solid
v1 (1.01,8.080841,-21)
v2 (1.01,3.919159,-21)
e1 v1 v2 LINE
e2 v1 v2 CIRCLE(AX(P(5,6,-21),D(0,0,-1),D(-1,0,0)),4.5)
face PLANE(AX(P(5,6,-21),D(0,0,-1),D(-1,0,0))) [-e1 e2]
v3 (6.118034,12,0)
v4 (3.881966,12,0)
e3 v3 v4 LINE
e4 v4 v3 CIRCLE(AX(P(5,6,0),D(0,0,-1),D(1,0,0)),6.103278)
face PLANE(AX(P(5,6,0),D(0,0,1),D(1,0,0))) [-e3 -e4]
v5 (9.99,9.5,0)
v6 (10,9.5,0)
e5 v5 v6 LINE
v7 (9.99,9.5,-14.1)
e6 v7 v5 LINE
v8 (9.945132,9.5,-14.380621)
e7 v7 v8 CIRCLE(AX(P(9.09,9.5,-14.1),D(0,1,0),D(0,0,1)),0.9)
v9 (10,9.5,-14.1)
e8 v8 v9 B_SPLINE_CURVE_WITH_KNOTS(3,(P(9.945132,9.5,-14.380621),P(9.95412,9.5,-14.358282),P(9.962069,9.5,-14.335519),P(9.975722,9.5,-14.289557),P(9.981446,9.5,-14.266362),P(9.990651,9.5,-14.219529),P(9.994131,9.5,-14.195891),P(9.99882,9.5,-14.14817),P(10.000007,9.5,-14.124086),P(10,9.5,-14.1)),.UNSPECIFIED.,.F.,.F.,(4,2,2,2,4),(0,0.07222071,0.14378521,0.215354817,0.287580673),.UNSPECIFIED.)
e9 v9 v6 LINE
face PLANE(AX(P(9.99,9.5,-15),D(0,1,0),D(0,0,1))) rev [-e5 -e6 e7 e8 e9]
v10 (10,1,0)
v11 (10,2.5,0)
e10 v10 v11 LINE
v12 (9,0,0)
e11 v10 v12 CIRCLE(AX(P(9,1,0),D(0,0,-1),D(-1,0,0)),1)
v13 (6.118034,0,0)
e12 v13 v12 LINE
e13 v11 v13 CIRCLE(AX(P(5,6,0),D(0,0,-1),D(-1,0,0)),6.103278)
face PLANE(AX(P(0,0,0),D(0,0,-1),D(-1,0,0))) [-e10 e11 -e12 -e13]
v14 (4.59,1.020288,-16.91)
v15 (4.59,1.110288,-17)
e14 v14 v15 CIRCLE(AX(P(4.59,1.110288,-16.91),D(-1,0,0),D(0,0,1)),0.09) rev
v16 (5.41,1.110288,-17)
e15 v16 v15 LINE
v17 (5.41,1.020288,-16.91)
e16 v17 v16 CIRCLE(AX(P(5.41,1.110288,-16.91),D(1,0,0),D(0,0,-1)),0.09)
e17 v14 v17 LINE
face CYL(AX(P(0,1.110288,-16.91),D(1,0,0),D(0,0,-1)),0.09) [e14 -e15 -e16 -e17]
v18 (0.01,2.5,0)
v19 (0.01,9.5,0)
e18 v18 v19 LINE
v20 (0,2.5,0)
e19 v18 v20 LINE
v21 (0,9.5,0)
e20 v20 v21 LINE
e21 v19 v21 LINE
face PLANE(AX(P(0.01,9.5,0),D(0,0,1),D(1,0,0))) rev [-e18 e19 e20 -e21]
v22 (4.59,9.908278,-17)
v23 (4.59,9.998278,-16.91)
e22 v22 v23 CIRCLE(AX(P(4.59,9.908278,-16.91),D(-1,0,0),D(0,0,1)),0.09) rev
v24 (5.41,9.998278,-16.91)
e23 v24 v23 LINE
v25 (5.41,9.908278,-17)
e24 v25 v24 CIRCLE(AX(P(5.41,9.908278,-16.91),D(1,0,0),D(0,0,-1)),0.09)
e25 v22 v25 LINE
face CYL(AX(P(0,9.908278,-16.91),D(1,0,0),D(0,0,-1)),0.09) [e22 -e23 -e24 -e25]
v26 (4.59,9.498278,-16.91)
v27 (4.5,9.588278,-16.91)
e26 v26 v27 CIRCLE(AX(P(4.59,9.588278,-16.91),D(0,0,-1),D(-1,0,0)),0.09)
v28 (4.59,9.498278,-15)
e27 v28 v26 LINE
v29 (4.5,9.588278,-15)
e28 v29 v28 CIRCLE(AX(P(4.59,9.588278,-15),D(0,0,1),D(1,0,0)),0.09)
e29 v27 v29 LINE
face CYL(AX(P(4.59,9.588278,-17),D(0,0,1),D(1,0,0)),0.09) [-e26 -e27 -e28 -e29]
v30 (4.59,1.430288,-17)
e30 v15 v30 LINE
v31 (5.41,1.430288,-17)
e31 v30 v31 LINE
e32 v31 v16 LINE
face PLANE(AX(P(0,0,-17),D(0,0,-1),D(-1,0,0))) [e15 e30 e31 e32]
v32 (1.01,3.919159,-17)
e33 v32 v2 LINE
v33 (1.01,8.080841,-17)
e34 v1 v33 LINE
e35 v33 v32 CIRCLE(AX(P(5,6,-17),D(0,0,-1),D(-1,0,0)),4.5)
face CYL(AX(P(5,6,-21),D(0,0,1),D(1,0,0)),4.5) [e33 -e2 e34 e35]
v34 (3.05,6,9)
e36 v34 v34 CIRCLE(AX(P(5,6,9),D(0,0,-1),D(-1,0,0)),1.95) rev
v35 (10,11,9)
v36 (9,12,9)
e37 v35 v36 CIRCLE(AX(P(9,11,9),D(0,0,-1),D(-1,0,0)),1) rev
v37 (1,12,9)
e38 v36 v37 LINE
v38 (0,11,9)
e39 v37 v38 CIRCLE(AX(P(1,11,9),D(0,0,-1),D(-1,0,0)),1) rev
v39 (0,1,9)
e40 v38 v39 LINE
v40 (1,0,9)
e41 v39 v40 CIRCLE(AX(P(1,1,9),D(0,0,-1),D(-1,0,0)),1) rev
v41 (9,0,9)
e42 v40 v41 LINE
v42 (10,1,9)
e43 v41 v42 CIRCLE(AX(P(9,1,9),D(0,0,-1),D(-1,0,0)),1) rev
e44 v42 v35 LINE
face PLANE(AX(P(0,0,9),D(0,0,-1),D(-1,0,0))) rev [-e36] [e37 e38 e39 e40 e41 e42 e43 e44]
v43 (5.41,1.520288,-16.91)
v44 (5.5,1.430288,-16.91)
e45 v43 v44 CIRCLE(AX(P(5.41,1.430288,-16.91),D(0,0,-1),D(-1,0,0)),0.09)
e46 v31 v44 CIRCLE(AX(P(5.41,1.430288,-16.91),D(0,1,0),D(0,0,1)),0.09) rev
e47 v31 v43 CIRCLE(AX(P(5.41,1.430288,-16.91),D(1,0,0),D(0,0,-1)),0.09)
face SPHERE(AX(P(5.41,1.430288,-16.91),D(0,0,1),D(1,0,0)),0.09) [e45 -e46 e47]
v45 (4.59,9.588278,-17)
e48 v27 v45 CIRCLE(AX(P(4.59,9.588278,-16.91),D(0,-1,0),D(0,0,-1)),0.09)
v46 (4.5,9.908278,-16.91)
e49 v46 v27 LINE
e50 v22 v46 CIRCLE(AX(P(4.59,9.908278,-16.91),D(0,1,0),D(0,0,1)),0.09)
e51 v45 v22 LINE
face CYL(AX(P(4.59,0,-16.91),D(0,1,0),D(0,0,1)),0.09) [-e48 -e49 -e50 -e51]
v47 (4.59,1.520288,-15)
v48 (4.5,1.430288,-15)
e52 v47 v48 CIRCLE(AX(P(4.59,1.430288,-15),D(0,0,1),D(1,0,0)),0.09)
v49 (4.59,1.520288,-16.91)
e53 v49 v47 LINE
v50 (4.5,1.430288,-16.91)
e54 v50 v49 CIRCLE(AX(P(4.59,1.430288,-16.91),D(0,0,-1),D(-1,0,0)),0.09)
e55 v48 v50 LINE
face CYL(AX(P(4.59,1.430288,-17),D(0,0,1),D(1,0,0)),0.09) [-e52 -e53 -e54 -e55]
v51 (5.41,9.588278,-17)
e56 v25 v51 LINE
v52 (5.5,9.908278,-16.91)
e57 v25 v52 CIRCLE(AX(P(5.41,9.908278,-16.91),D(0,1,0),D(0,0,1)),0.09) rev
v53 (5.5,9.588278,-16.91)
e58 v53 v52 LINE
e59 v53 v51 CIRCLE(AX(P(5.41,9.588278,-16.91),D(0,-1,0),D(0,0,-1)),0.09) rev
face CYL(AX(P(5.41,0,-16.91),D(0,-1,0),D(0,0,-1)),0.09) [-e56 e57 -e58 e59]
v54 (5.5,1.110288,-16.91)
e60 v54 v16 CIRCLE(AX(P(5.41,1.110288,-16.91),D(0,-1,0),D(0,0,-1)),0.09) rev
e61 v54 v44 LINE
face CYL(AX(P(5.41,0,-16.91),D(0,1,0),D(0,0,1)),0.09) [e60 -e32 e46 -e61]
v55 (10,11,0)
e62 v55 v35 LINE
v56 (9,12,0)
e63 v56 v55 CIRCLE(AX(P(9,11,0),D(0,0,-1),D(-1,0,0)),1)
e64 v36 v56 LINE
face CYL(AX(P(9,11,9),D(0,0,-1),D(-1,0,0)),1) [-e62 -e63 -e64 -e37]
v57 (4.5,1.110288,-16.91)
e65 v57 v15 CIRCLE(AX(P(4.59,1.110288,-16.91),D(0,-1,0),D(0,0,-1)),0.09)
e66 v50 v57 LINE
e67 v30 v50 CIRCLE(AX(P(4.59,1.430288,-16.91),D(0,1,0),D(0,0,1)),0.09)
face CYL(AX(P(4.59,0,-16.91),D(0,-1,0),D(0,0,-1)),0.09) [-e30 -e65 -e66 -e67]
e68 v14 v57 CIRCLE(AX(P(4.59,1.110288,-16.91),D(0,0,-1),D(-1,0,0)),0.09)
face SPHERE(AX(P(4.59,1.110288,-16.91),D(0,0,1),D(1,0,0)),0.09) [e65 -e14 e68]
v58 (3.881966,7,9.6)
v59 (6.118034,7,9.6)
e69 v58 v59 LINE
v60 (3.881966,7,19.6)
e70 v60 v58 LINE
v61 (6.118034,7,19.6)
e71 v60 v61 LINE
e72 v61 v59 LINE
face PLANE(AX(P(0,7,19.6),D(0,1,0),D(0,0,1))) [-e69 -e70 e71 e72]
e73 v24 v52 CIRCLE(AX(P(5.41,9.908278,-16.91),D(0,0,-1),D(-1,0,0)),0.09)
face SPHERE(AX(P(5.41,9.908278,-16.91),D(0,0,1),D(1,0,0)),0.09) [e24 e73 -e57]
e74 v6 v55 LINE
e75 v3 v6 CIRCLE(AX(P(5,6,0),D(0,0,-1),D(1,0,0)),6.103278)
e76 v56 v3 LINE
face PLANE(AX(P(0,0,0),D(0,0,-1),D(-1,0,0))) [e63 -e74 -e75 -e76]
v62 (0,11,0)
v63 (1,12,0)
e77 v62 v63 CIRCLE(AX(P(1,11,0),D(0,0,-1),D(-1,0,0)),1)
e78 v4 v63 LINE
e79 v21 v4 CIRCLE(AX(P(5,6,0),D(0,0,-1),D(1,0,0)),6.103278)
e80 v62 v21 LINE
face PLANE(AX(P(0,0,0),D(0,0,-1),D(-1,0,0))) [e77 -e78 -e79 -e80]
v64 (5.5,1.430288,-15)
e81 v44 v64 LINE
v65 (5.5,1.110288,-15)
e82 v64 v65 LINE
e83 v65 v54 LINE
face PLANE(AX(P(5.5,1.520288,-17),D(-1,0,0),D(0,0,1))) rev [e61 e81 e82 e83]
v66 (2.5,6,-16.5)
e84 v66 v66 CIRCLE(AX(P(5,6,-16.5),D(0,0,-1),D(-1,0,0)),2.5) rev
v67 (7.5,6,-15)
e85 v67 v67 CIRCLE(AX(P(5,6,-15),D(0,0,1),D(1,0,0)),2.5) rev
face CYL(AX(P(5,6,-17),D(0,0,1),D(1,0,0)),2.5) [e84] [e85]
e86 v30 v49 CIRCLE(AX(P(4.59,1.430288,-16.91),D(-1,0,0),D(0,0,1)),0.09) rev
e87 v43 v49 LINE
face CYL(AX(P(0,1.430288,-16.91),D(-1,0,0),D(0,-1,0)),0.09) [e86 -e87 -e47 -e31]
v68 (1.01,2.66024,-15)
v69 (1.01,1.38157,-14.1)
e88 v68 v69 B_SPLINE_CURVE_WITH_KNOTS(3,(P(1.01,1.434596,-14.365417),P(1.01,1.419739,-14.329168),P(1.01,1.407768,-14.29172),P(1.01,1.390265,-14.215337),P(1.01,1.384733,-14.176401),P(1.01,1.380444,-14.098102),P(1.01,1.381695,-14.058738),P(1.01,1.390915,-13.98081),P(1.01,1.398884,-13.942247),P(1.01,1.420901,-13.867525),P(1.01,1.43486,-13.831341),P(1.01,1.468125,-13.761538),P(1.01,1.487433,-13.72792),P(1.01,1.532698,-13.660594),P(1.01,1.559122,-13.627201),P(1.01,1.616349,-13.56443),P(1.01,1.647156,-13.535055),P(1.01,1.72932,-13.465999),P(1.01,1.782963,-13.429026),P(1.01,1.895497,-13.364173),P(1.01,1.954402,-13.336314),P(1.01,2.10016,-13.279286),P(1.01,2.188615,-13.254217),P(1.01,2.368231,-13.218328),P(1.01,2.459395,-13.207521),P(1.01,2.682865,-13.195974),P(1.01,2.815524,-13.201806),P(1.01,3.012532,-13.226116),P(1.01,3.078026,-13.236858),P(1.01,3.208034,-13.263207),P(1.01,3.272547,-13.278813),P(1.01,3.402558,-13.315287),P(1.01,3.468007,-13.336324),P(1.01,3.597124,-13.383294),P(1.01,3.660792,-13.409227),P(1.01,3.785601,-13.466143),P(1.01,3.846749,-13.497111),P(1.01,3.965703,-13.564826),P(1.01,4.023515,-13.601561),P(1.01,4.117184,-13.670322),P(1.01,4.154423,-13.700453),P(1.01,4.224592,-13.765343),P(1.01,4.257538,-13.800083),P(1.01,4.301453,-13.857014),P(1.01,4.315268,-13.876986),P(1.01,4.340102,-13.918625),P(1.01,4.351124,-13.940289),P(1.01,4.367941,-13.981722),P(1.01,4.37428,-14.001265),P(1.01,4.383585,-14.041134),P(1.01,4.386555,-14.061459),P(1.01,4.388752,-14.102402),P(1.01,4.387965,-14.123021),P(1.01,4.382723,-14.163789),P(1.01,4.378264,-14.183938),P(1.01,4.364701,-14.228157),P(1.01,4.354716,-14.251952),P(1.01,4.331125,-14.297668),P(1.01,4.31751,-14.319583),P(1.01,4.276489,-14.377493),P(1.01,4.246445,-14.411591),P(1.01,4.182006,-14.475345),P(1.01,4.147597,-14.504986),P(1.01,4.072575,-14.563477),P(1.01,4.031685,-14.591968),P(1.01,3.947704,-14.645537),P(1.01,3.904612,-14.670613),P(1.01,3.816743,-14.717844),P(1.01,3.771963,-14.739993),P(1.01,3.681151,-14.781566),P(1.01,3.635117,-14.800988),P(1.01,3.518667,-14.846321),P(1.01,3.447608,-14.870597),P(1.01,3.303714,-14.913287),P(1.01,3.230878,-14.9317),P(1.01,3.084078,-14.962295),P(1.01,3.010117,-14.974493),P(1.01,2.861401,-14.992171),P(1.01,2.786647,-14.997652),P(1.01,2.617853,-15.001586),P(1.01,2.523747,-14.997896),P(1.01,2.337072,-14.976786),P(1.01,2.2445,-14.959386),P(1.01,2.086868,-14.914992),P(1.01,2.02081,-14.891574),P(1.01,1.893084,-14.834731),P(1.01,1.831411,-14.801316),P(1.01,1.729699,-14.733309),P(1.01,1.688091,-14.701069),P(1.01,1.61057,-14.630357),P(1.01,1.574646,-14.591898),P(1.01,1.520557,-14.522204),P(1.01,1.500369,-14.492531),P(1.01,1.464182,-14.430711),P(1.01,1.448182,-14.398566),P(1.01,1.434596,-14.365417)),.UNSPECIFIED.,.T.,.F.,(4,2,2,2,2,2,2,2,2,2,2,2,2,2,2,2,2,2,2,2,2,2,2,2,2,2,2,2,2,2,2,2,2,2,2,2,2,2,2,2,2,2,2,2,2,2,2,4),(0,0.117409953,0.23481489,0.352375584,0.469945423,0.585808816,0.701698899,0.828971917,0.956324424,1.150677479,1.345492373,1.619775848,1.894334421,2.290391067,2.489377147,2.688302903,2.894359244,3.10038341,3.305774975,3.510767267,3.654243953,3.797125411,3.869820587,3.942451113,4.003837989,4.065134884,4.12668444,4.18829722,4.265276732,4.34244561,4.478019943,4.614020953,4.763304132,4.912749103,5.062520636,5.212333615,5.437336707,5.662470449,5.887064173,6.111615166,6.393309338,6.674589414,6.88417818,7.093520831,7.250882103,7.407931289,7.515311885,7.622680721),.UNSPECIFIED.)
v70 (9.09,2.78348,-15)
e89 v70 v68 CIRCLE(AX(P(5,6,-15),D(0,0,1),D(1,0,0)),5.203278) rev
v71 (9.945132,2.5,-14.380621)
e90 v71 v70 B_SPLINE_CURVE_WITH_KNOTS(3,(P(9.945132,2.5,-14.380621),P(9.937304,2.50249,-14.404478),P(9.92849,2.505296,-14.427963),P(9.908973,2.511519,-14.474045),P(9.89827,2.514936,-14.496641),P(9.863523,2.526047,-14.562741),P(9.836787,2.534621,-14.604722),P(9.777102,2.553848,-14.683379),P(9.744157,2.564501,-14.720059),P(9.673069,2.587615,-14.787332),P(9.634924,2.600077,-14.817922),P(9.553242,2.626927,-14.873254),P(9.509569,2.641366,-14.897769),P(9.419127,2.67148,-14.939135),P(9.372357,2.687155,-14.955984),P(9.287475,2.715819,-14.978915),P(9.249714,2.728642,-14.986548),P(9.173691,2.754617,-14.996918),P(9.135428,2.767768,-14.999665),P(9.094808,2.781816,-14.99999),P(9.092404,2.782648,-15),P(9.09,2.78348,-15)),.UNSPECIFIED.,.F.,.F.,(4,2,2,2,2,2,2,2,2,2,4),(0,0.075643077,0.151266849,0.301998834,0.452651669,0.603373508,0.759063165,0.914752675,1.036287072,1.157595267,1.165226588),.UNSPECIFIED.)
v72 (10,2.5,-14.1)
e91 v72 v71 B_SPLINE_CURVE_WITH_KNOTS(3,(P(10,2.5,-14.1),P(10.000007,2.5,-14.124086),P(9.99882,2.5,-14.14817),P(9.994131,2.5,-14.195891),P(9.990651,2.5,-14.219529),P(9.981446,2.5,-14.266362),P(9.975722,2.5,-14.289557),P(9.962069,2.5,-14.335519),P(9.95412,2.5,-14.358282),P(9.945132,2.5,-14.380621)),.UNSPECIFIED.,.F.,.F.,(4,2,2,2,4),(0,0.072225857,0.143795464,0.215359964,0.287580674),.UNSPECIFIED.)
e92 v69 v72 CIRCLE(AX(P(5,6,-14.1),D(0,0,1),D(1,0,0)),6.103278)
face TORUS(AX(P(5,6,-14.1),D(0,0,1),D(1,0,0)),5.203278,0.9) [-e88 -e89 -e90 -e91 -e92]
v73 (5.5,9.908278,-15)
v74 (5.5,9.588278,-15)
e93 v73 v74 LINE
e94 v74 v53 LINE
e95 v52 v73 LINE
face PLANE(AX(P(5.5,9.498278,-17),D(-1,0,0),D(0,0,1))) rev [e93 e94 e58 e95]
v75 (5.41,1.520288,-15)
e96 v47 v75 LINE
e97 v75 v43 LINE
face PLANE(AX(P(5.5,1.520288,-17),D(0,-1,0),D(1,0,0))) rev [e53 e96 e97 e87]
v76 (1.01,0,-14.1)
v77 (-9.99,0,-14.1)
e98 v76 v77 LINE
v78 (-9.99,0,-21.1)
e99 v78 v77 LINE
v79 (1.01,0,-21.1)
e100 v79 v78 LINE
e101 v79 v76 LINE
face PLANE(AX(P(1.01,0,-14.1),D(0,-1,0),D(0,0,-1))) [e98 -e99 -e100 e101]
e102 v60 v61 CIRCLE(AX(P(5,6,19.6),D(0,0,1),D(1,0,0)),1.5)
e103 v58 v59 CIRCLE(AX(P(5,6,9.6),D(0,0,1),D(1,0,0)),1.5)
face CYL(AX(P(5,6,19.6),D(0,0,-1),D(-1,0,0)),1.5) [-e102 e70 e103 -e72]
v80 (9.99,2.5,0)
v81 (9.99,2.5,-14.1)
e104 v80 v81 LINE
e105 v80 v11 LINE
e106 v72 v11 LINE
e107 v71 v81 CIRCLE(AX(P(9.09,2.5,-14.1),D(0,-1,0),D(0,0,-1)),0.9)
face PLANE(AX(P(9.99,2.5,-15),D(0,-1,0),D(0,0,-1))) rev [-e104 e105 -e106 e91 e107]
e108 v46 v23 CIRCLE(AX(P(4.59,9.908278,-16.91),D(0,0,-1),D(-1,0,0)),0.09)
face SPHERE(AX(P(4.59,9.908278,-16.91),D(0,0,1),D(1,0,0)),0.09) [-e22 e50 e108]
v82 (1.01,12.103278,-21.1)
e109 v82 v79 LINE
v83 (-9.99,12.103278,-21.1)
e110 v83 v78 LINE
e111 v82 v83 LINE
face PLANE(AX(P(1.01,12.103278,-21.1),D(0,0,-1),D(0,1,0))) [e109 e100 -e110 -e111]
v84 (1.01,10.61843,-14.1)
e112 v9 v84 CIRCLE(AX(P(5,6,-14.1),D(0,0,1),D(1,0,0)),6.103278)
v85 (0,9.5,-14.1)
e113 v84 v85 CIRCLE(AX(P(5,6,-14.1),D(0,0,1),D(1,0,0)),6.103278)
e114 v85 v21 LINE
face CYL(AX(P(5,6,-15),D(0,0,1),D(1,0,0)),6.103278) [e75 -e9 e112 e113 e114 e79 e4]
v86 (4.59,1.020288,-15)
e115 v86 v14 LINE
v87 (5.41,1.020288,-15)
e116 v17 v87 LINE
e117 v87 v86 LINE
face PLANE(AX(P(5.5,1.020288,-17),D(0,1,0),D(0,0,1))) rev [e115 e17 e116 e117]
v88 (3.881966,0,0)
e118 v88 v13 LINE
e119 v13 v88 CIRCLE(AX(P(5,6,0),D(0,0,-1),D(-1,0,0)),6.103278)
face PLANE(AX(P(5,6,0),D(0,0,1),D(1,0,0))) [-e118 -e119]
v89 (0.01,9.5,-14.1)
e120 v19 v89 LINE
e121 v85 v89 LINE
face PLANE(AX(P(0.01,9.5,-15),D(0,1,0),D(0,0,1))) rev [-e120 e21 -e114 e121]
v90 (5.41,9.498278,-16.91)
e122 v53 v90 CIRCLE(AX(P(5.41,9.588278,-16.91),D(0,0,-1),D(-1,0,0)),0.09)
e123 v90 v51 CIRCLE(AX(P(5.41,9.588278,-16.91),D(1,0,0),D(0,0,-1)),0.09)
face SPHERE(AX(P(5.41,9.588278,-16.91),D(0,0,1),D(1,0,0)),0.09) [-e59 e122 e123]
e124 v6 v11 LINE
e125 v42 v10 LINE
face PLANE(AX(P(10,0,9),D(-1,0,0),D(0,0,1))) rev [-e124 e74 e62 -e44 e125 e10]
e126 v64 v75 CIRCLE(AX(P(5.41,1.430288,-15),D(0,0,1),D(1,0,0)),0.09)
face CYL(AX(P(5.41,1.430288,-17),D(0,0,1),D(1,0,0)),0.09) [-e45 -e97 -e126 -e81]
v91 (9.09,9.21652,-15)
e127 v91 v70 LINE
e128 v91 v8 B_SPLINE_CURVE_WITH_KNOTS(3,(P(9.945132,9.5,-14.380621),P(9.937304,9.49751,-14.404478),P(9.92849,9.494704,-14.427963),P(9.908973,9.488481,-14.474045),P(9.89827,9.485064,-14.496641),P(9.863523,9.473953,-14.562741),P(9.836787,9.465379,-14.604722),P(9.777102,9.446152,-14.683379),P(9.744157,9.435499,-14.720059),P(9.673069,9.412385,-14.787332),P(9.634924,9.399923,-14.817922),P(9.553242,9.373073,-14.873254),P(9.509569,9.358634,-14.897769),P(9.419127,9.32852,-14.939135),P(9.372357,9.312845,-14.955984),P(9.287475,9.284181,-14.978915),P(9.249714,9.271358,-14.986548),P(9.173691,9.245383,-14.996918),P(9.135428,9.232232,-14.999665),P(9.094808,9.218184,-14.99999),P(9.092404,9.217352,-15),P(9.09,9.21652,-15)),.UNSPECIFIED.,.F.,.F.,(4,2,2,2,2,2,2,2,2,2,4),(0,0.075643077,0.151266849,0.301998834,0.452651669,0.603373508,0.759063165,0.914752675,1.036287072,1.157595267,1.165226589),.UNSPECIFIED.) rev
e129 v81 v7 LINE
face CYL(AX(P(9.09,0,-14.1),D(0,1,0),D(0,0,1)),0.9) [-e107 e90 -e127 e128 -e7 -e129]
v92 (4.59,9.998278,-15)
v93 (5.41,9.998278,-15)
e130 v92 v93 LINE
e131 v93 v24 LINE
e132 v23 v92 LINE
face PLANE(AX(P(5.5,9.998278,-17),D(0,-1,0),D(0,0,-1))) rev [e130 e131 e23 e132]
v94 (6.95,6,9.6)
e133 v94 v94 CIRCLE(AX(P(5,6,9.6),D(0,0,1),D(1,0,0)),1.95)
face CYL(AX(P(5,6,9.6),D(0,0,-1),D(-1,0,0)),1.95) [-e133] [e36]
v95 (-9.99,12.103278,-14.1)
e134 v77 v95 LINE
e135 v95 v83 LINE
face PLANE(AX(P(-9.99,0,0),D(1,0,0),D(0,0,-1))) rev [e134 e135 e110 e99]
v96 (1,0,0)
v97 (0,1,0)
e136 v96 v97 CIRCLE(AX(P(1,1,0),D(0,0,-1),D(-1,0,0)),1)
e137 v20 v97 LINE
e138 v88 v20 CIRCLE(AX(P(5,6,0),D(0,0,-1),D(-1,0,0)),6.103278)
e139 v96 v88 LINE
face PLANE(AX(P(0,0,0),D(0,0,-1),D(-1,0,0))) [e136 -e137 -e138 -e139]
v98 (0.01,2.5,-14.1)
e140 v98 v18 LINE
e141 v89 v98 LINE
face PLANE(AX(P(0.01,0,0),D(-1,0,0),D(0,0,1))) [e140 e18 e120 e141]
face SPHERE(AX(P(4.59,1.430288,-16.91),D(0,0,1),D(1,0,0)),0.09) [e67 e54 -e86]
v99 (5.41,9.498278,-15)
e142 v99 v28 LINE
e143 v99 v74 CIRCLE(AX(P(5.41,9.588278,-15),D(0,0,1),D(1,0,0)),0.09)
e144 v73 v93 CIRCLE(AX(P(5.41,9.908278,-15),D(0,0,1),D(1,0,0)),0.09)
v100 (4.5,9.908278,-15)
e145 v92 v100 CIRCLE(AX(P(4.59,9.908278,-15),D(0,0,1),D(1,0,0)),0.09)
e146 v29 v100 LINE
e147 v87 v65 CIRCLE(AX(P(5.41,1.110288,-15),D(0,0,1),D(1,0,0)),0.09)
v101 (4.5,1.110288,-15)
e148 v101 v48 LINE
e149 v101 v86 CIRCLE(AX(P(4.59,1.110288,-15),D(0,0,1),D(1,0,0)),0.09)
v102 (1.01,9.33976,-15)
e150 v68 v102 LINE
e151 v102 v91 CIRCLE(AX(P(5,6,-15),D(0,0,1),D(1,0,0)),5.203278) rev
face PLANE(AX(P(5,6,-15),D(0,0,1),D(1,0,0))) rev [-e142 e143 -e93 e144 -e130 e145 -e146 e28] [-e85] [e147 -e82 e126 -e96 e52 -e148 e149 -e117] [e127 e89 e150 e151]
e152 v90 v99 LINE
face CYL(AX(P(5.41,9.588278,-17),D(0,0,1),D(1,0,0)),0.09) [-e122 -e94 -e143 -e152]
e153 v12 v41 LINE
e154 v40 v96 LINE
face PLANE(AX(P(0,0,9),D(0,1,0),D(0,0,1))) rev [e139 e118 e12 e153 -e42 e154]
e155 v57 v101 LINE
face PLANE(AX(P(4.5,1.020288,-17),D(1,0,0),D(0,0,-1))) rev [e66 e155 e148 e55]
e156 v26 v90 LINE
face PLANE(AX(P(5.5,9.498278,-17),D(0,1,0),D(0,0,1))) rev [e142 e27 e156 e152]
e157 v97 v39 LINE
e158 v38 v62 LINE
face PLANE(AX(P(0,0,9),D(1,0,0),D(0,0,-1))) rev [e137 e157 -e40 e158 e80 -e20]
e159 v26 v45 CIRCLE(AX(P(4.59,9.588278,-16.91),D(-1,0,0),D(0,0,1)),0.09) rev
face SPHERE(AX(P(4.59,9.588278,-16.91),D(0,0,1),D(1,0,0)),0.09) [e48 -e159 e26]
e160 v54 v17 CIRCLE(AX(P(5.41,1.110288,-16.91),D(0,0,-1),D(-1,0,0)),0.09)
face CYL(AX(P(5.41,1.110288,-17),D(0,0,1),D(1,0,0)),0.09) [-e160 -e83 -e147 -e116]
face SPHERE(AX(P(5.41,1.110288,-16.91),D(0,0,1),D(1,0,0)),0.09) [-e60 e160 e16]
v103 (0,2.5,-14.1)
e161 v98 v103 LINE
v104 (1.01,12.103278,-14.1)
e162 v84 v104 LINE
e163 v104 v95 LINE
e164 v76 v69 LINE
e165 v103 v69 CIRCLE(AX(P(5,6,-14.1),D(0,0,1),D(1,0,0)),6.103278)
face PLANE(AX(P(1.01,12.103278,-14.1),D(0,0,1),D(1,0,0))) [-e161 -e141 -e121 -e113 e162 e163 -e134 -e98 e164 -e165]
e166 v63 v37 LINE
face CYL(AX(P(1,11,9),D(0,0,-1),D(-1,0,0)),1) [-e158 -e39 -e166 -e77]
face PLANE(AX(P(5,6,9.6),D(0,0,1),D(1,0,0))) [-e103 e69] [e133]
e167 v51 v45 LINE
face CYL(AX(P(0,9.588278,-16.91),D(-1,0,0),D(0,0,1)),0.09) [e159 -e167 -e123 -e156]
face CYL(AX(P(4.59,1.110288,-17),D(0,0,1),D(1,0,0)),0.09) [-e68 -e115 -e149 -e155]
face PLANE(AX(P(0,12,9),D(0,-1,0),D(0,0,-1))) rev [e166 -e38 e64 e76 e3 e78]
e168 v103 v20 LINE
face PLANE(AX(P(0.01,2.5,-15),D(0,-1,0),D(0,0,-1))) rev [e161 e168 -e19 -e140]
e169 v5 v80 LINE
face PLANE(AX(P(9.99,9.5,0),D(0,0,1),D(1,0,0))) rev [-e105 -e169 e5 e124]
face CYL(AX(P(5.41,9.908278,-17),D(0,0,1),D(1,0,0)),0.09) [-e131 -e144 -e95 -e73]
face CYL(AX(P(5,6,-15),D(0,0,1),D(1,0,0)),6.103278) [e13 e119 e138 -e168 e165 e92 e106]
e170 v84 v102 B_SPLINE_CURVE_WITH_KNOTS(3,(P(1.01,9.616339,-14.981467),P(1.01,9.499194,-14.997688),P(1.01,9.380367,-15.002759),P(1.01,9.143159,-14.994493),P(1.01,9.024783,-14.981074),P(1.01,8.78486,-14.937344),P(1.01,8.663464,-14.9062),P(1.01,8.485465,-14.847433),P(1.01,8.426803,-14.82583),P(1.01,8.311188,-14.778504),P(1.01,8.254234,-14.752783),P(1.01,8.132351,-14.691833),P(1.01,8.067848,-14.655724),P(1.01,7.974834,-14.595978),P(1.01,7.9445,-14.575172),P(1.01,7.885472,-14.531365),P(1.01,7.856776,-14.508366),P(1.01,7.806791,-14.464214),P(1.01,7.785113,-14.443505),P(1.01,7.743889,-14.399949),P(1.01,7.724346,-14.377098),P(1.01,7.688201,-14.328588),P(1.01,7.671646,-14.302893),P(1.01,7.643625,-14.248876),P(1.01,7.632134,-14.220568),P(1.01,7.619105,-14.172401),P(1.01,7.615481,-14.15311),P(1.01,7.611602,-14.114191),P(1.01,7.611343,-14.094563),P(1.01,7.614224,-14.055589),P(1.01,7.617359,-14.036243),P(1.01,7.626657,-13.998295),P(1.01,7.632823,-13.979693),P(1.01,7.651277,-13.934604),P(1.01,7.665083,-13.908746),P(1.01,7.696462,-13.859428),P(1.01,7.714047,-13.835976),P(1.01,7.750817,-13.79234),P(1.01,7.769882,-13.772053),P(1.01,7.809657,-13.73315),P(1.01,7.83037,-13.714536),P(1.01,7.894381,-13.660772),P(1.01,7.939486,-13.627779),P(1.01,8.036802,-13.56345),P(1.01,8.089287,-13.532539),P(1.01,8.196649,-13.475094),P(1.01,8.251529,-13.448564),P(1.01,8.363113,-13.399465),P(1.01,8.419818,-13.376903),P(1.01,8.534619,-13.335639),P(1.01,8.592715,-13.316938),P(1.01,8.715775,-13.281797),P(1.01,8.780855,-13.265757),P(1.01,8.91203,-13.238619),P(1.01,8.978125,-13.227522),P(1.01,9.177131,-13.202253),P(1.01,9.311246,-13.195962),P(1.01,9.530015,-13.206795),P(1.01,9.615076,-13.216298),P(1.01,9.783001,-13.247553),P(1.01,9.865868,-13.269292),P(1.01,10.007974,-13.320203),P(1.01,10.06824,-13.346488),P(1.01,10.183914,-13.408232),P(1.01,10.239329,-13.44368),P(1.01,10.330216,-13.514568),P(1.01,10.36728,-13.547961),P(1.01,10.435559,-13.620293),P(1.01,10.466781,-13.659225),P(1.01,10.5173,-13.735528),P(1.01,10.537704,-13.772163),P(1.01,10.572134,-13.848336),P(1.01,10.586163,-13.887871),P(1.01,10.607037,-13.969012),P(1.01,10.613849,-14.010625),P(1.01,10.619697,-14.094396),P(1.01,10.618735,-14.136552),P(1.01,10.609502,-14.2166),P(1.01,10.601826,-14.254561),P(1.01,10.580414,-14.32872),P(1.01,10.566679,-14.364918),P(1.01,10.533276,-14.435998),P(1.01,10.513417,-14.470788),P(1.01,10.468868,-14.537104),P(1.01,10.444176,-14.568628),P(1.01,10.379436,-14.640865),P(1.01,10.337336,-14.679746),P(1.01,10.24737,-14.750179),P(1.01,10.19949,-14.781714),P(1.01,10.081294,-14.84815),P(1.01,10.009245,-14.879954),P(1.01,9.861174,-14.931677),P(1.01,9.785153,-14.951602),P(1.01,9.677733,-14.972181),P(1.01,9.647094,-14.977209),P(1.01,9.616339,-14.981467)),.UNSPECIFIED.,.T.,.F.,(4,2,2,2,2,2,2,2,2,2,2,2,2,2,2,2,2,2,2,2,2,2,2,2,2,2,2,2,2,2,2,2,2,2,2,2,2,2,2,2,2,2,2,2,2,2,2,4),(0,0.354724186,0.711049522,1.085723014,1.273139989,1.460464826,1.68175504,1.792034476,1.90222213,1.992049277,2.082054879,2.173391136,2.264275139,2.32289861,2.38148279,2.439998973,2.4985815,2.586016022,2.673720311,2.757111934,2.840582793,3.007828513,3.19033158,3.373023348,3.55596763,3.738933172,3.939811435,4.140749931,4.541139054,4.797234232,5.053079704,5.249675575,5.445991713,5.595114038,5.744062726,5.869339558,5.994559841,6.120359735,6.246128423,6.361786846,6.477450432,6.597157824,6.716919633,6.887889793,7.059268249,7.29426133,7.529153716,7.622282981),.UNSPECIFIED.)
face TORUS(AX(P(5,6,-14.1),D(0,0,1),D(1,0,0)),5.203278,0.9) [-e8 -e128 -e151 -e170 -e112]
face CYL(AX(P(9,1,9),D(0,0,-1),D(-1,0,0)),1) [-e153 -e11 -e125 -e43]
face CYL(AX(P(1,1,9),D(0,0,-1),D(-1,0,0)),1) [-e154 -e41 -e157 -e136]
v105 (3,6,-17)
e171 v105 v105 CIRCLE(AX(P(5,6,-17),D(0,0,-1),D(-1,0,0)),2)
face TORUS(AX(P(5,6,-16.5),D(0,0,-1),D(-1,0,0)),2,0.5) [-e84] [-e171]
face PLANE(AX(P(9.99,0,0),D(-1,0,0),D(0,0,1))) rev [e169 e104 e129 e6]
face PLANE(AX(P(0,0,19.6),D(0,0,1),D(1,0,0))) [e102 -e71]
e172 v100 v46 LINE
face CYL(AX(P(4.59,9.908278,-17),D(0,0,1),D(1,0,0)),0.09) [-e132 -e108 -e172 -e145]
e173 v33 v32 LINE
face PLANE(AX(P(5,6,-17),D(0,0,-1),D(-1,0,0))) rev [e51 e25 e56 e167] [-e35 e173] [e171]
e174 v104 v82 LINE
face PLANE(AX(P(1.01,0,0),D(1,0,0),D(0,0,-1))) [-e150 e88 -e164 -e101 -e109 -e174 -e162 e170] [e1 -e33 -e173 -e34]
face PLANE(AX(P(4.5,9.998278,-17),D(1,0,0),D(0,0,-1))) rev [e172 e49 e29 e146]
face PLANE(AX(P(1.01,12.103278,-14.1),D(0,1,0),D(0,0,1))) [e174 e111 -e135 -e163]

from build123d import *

# Parameters (mm, degrees)
CROQUIS1_W               = 10
CROQUIS1_H               = 12
SALIENTE_EXTRUIR1_DEPTH  = 9
SALIENTE_EXTRUIR2_DEPTH  = 15
CROQUIS3_W               = 1
CROQUIS3_H               = 0.5
SALIENTE_EXTRUIR3_DEPTH  = 2
CROQUIS4_R               = 2.5000000000000004
SALIENTE_EXTRUIR4_DEPTH  = 2
CROQUIS5_R               = 1.95
SALIENTE_EXTRUIR5_DEPTH  = 0.6
SALIENTE_EXTRUIR9_DEPTH  = 10
CROQUIS7_W               = 15.000000000000002
CROQUIS7_H               = 7.000000000000002
CORTAR_EXTRUIR1_DEPTH    = 0.01
CROQUIS8_W               = 15.000000000000002
CROQUIS8_H               = 7.0000000000000036
CORTAR_EXTRUIR2_DEPTH    = 0.01
REDONDEO1_R              = 0.9
REDONDEO2_R              = 0.9
REDONDEO3_R              = 0.5
CROQUIS9_R               = 0.4628353533662974
SALIENTE_EXTRUIR7_DEPTH  = 0.01
REDONDEO4_R              = 0.09
REDONDEO6_R              = 1
SKETCH2_R                = 4.5
BOSS_EXTRUDE1_DEPTH      = 4
BOSS_EXTRUDE3_DEPTH      = 10
BOSS_EXTRUDE3_DEPTH_BACK = 1


with BuildPart() as part:
    # Croquis1 → Saliente-Extruir1 (new body)
    with BuildSketch(Plane.XY):
        with Locations((5, 6)):
            Rectangle(CROQUIS1_W, CROQUIS1_H)
    extrude(amount=SALIENTE_EXTRUIR1_DEPTH)

    # Croquis2 → Saliente-Extruir2 (add)
    with BuildSketch(Plane(origin=(0, 0, 0), x_dir=(-1, 0, 0), z_dir=(0, 0, -1))):
        with BuildLine():
            Line((-10, 9.5), (-10, 2.5))
            ThreePointArc((-10, 2.5), (-5, -0.10327780786685103), (0, 2.5000000000000004))
            Line((0, 2.5000000000000004), (0, 9.5))
            ThreePointArc((0, 9.5), (-5, 12.103277807866851), (-10, 9.5))
        make_face()
    extrude(amount=SALIENTE_EXTRUIR2_DEPTH)

    # Croquis3 → Saliente-Extruir3 (add)
    with BuildSketch(Plane(origin=(0, 0, -15), x_dir=(-1, 0, 0), z_dir=(0, 0, -1))):
        with Locations((-5.000000000000001, 9.748277807866852)):
            Rectangle(CROQUIS3_W, CROQUIS3_H)
        Polygon((-5.499999999999999, 1.520287769635288), (-4.499999999999999, 1.5202877696352886), (-4.499999999999999, 1.020287769635288), (-5.499999999999999, 1.020287769635288), align=None)
    extrude(amount=SALIENTE_EXTRUIR3_DEPTH)

    # Croquis4 → Saliente-Extruir4 (add)
    with BuildSketch(Plane(origin=(0, 0, -15), x_dir=(-1, 0, 0), z_dir=(0, 0, -1))):
        with Locations(Location((-5, 6, 0), (0, 0, 180))):
            Circle(CROQUIS4_R)
    extrude(amount=SALIENTE_EXTRUIR4_DEPTH)

    # Croquis5 → Saliente-Extruir5 (add)
    with BuildSketch(Plane.XY.offset(9)):
        with Locations(Location((5, 6, 0), (0, 0, 180))):
            Circle(CROQUIS5_R)
    extrude(amount=SALIENTE_EXTRUIR5_DEPTH)

    # Croquis6 → Saliente-Extruir9 (add)
    with BuildSketch(Plane.XY.offset(9.6)):
        with BuildLine():
            Line((3.8819660112501033, 6.999999999999999), (6.118033988749897, 6.999999999999999))
            ThreePointArc((6.118033988749897, 6.999999999999999), (5, 4.499999999999999), (3.8819660112501033, 6.999999999999999))
        make_face()
    extrude(amount=SALIENTE_EXTRUIR9_DEPTH)

    # Croquis7 → Cortar-Extruir1 (cut)
    with BuildSketch(Plane(origin=(10, 0, 0), x_dir=(0, 0, -1), z_dir=(1, 0, 0))):
        with Locations((7.500000000000001, 5.999999999999999)):
            Rectangle(CROQUIS7_W, CROQUIS7_H)
    extrude(amount=-CORTAR_EXTRUIR1_DEPTH, mode=Mode.SUBTRACT)

    # Croquis8 → Cortar-Extruir2 (cut)
    with BuildSketch(Plane.ZY):
        with Locations((-7.500000000000001, 5.999999999999998)):
            Rectangle(CROQUIS8_W, CROQUIS8_H)
    extrude(amount=-CORTAR_EXTRUIR2_DEPTH, mode=Mode.SUBTRACT)

    # Redondeo1
    redondeo1_edges = [part.edges().sort_by_distance(p)[0] for p in [
        (9.99, 6, -15),
        (0.01, 5.999999999999998, -15),
    ]]
    fillet(redondeo1_edges, radius=REDONDEO1_R)

    # Redondeo2
    # the kernel refuses this fillet: 0.9 mm, written as the material it takes off along each edge
    with BuildSketch(Plane(origin=(5, 6.000000000000001, -15), x_dir=(-0.9708964954680348, 0.23949946782381015, 0), z_dir=(-0.23949946782381015, -0.9708964954680348, 0))) as redondeo2_piece_1:
        with BuildLine():
            CenterArc((6.103277807866849 - REDONDEO2_R, -REDONDEO2_R), REDONDEO2_R, 0, 90)
            Line((6.103277807866849, -REDONDEO2_R), (6.103277807866849, 0))
            Line((6.103277807866849, 0), (6.103277807866849 - REDONDEO2_R, 0))
        make_face()
    revolve(axis=Axis((5, 6.000000000000001, -15), (0, 0, -1)), revolution_arc=152.28599911771772, mode=Mode.SUBTRACT)
    with BuildSketch(Plane(origin=(5, 6, -15), x_dir=(0.9708964954680347, -0.23949946782381032, 0), z_dir=(0.23949946782381032, 0.9708964954680347, 0))) as redondeo2_piece_2:
        with BuildLine():
            CenterArc((6.103277807866849 - REDONDEO2_R, -REDONDEO2_R), REDONDEO2_R, 0, 90)
            Line((6.103277807866849 - REDONDEO2_R, 0), (6.103277807866849, 0))
            Line((6.103277807866849, 0), (6.103277807866849, -REDONDEO2_R))
        make_face()
    revolve(axis=Axis((5, 6, -15), (0, 0, -1)), revolution_arc=152.2859991177177, mode=Mode.SUBTRACT)

    # Redondeo3
    redondeo3_edges = [part.edges().sort_by_distance(p)[0] for p in [
        (2.4999999999999996, 5.999999999999999, -17),
    ]]
    fillet(redondeo3_edges, radius=REDONDEO3_R)

    # Croquis9 → Saliente-Extruir7 (add)
    with BuildSketch(Plane(origin=(0, 0, -17), x_dir=(-1, 0, 0), z_dir=(0, 0, -1))):
        with Locations((-5, 6)):
            Circle(CROQUIS9_R)
    extrude(amount=SALIENTE_EXTRUIR7_DEPTH)

    # Redondeo4
    redondeo4_edges = [part.edges().sort_by_distance(p)[0] for p in [
        (5.500000000000001, 9.998277807866852, -16),
        (5.500000000000001, 9.498277807866852, -16),
        (4.500000000000001, 9.498277807866852, -16),
        (4.500000000000001, 9.998277807866852, -16),
        (5.500000000000001, 9.748277807866852, -17),
        (5.000000000000001, 9.498277807866852, -17),
        (4.500000000000001, 9.748277807866852, -17),
        (5.000000000000001, 9.998277807866852, -17),
        (5.499999999999999, 1.520287769635288, -16),
        (5.499999999999999, 1.020287769635288, -16),
        (4.499999999999999, 1.020287769635288, -16),
        (4.499999999999999, 1.5202877696352886, -16),
        (5.499999999999999, 1.270287769635288, -17),
        (4.999999999999999, 1.020287769635288, -17),
        (4.499999999999999, 1.2702877696352883, -17),
        (4.999999999999999, 1.5202877696352883, -17),
    ]]
    fillet(redondeo4_edges, radius=REDONDEO4_R)

    # Redondeo6
    redondeo6_edges = [part.edges().sort_by_distance(p)[0] for p in [
        (10, 12, 4.5),
        (10, 0, 4.5),
        (0, 0, 4.5),
        (0, 12, 4.5),
    ]]
    fillet(redondeo6_edges, radius=REDONDEO6_R)

    # Sketch2 → Boss-Extrude1 (add)
    with BuildSketch(Plane(origin=(0, 0, -17), x_dir=(-1, 0, 0), z_dir=(0, 0, -1))):
        with Locations((-5, 6)):
            Circle(SKETCH2_R)
    extrude(amount=BOSS_EXTRUDE1_DEPTH)

    # Sketch3 → Boss-Extrude3 (add, two sides: drawn at the far end of the back side and taken through both)
    with BuildSketch(Plane.ZY.offset(-0.01).offset(-BOSS_EXTRUDE3_DEPTH_BACK)):
        Polygon((-14.100000000000003, 12.103277807866851), (-21.100000000000005, 12.103277807866851), (-21.1, 0), (-14.100000000000003, 0), align=None)
    extrude(amount=BOSS_EXTRUDE3_DEPTH + BOSS_EXTRUDE3_DEPTH_BACK)


solid = part.part
